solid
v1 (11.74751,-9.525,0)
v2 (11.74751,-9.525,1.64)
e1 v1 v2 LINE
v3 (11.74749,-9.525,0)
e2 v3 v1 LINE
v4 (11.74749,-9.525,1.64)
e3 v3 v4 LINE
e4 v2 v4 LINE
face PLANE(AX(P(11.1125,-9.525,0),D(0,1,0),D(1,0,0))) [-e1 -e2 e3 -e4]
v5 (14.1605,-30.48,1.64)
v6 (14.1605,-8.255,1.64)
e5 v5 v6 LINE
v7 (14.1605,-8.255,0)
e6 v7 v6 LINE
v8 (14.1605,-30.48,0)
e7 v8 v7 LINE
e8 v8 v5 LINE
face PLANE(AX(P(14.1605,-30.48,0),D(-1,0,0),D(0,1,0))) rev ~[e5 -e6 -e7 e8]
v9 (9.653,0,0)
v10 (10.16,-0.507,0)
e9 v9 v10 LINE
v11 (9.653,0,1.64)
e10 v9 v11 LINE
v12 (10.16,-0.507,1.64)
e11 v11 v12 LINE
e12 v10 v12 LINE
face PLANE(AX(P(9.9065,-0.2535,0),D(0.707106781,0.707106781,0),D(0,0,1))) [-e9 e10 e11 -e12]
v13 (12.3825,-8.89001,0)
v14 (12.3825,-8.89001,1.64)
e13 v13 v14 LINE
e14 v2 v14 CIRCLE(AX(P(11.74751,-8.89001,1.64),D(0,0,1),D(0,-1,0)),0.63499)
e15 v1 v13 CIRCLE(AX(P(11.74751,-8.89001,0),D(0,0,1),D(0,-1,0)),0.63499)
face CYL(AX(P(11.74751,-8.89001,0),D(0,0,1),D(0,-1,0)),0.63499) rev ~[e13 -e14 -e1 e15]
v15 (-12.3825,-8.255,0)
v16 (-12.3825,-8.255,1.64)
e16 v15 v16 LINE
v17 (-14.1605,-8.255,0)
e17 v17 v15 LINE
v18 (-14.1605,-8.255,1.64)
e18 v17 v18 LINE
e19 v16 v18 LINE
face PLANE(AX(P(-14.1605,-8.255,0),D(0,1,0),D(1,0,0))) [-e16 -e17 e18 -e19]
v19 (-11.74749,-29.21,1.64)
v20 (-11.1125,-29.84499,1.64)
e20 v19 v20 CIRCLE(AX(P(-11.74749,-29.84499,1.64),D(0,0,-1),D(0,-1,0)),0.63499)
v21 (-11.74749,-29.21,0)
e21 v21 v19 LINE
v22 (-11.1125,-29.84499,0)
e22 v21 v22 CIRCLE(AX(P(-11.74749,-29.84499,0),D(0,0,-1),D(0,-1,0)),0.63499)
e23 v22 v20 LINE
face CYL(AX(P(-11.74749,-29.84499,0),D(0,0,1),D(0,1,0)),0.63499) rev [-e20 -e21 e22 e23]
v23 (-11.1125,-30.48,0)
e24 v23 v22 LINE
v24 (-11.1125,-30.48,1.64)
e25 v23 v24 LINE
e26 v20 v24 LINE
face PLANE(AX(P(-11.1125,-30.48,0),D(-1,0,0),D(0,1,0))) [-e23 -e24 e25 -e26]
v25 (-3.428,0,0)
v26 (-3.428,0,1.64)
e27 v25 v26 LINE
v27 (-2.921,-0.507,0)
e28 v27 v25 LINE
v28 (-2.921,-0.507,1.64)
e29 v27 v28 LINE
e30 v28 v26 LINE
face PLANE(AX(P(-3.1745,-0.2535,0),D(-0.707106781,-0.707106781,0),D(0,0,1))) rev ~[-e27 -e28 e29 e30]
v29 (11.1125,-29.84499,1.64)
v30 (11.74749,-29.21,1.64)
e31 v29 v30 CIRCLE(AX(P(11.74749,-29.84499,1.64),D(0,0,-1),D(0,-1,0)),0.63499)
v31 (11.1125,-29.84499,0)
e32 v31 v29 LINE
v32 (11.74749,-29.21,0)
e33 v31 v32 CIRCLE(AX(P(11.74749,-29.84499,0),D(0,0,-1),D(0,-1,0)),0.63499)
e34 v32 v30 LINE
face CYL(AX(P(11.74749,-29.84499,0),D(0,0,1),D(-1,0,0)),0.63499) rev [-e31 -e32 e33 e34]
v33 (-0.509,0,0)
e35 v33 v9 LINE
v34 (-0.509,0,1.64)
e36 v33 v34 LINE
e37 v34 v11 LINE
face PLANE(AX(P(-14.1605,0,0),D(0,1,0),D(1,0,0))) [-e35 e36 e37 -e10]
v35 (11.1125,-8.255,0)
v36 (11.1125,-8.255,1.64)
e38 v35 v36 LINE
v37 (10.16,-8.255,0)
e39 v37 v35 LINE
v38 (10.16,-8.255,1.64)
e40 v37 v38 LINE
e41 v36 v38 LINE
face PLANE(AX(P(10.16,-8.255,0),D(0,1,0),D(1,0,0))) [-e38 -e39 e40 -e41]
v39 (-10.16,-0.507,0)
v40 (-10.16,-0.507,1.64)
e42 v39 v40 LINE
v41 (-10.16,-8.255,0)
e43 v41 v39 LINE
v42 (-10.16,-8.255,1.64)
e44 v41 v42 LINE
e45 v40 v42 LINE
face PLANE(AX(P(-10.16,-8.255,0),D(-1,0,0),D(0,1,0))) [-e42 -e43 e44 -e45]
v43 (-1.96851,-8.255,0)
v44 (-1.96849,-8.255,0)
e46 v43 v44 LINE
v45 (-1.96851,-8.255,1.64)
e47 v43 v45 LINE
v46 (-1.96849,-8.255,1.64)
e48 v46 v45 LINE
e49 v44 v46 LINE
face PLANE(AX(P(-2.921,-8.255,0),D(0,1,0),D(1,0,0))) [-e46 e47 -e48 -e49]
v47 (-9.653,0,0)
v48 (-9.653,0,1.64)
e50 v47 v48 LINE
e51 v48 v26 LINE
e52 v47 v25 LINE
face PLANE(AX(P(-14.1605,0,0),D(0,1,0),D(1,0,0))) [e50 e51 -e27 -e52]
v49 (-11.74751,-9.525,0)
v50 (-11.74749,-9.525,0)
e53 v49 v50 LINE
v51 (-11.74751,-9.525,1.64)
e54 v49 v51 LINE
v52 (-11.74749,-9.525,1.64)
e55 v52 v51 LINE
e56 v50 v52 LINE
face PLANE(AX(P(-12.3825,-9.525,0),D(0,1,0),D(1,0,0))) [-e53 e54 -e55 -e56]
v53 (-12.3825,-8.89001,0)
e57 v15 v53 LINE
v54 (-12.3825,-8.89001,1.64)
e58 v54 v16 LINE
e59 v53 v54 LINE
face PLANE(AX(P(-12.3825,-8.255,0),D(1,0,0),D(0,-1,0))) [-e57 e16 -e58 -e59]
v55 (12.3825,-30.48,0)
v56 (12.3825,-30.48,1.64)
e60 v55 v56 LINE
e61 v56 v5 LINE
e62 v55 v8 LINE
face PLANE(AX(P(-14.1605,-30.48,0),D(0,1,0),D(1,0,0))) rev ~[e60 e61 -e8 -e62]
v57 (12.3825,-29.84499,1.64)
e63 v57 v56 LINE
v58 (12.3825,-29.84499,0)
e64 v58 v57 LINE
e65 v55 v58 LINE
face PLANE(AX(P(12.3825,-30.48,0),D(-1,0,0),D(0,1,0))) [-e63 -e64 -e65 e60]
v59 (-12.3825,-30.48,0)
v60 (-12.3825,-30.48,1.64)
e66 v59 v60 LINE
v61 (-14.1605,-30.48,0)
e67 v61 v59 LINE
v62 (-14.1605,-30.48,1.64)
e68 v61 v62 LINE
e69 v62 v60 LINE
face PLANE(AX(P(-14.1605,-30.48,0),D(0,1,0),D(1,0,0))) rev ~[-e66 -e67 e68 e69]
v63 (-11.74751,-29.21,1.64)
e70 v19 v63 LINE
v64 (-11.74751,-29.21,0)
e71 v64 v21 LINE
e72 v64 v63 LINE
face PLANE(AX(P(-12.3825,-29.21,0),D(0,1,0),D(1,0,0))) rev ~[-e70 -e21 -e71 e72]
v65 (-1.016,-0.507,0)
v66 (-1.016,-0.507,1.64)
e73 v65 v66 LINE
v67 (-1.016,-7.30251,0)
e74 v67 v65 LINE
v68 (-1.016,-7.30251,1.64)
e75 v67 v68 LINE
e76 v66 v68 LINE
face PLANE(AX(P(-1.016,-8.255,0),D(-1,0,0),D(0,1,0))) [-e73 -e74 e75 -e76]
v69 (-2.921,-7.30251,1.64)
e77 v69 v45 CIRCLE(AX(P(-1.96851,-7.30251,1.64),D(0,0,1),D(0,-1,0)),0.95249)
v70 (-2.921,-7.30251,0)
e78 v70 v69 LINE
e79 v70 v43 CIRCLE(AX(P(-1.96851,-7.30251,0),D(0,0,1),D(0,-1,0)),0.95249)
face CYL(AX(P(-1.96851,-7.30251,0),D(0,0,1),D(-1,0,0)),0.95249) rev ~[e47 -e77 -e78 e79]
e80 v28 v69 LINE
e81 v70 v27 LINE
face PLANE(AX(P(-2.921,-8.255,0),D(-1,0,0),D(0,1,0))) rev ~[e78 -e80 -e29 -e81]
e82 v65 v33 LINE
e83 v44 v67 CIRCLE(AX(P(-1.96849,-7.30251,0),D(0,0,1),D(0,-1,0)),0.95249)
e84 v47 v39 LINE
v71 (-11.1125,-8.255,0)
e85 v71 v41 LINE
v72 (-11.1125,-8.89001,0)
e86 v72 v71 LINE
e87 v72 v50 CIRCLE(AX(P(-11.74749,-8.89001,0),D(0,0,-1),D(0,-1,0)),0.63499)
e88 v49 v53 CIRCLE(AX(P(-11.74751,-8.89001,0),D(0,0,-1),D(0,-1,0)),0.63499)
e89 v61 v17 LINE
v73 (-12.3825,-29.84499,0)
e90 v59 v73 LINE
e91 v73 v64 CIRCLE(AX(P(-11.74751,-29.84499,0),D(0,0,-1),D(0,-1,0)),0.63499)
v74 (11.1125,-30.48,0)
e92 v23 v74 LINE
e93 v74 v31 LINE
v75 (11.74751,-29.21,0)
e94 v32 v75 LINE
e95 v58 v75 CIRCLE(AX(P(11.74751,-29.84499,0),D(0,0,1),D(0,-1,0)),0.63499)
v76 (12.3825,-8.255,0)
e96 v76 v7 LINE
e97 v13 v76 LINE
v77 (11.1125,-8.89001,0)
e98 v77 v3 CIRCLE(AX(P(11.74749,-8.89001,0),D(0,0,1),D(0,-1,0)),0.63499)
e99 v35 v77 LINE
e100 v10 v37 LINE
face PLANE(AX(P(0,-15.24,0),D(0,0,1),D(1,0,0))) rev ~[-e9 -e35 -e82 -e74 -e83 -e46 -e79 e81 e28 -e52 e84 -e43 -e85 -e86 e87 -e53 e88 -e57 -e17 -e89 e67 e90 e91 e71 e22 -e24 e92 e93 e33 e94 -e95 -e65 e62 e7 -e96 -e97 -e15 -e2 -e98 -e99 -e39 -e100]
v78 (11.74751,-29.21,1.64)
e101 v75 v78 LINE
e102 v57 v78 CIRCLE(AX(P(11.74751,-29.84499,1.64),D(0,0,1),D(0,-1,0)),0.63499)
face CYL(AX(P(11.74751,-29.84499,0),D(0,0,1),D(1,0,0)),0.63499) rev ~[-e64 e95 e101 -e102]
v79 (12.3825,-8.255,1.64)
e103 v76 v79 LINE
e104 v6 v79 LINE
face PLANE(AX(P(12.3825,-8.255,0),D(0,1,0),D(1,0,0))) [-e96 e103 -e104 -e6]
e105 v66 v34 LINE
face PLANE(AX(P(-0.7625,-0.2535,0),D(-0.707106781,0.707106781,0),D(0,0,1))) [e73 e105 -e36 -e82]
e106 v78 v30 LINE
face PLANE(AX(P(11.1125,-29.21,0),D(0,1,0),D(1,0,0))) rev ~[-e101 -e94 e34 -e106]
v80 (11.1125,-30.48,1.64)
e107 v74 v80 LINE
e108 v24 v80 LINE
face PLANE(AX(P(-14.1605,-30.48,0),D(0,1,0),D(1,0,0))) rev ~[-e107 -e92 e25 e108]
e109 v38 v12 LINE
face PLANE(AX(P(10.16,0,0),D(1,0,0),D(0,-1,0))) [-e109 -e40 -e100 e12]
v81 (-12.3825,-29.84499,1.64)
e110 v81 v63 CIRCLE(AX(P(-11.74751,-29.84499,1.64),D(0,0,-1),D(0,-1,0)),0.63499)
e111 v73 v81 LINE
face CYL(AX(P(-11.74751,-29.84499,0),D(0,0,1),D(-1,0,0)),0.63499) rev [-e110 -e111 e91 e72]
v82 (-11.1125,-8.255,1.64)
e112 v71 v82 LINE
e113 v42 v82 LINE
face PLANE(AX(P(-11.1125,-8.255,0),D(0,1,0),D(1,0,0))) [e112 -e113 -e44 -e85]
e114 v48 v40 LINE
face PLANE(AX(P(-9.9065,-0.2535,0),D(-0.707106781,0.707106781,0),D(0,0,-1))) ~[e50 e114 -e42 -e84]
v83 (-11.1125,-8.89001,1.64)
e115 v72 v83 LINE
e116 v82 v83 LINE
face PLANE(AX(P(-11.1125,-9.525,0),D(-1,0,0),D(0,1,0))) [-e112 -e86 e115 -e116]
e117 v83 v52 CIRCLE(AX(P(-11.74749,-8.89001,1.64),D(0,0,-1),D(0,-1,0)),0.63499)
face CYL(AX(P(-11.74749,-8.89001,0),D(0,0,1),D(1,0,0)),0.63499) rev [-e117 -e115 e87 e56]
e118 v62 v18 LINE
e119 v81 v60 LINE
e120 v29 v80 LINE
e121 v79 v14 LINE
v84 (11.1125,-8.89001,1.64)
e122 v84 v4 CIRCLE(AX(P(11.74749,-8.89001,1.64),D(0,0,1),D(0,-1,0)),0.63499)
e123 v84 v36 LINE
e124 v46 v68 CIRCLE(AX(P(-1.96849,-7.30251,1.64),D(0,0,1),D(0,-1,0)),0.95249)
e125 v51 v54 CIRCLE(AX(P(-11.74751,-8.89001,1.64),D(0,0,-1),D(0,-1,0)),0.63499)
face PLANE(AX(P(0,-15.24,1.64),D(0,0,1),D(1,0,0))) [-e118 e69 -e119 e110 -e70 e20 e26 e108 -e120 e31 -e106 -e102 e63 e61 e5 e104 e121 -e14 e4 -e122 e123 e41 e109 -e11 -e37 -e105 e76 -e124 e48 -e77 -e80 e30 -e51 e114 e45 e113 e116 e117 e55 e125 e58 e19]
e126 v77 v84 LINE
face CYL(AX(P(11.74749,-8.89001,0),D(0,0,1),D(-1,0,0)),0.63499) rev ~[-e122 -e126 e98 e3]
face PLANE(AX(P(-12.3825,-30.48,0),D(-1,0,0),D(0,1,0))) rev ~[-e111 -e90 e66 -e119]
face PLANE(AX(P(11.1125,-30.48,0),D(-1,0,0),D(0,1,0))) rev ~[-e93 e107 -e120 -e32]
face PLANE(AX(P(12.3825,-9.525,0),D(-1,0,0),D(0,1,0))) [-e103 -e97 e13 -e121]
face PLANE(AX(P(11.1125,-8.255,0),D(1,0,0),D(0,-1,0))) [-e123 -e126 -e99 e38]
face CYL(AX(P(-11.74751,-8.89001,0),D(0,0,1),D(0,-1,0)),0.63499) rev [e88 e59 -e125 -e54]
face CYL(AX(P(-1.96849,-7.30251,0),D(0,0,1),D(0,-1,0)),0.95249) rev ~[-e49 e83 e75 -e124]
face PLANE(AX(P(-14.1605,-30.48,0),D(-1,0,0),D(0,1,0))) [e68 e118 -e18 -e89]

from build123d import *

# Parameters (mm, degrees)
F0_W     = 28.321
F0_H     = 30.48
F1_DEPTH = 1.64
F2_W     = 1.905
F2_H     = 8.255
F2_W_2   = 1.27
F2_H_2   = 1.27
F3_DEPTH = 25
F4_R     = 0.95249
F5_SIZE  = 0.507
F6_R     = 0.63499


# Not quite as in the source:
# - a fillet or chamfer is up to 0.001 mm smaller than in the source, because OpenCascade refuses the exact size


with BuildPart() as f1:
    # F0 (on Top) → F1 (new body)
    with BuildSketch(Plane.XY):
        with Locations((0, -15.24)):
            Rectangle(F0_W, F0_H)
    extrude(amount=F1_DEPTH)

    # F2 (on Top) → F3 (cut)
    with BuildSketch(Plane.XY):
        Polygon((-10.16, 0), (-14.1605, 0), (-14.1605, -8.255), (-12.3825, -8.255), (-12.3825, -9.525), (-11.1125, -9.525), (-11.1125, -8.255), (-10.16, -8.255), align=None)
        with Locations((-1.9685, -4.1275)):
            Rectangle(F2_W, F2_H)
        Polygon((14.1605, -8.255), (14.1605, 0), (10.16, 0), (10.16, -8.255), (11.1125, -8.255), (11.1125, -9.525), (12.3825, -9.525), (12.3825, -8.255), align=None)
        with Locations((-11.7475, -29.845)):
            Rectangle(F2_W_2, F2_H_2)
        with Locations((11.7475, -29.845)):
            Rectangle(F2_W_2, F2_H_2)
    extrude(amount=F3_DEPTH, mode=Mode.SUBTRACT)

    # F4 (radius 0.9525 in the source; OpenCascade refuses exactly that, so slightly less here)
    f4_edges = [f1.edges().sort_by_distance(p)[0] for p in [
        (-2.921, -8.255, 0.82),
        (-1.016, -8.255, 0.82),
    ]]
    fillet(f4_edges, radius=F4_R)

    # F5
    f5_edges = [f1.edges().sort_by_distance(p)[0] for p in [
        (10.16, 0, 0.82),
        (-1.016, 0, 0.82),
        (-2.921, 0, 0.82),
        (-10.16, 0, 0.82),
    ]]
    chamfer(f5_edges, length=F5_SIZE)

    # F6 (radius 0.635 in the source; OpenCascade refuses exactly that, so slightly less here)
    f6_edges = [f1.edges().sort_by_distance(p)[0] for p in [
        (12.3825, -29.21, 0.82),
        (-12.3825, -29.21, 0.82),
        (-11.1125, -29.21, 0.82),
        (11.1125, -29.21, 0.82),
        (11.1125, -9.525, 0.82),
        (12.3825, -9.525, 0.82),
        (-12.3825, -9.525, 0.82),
        (-11.1125, -9.525, 0.82),
    ]]
    fillet(f6_edges, radius=F6_R)


solid = f1.part
